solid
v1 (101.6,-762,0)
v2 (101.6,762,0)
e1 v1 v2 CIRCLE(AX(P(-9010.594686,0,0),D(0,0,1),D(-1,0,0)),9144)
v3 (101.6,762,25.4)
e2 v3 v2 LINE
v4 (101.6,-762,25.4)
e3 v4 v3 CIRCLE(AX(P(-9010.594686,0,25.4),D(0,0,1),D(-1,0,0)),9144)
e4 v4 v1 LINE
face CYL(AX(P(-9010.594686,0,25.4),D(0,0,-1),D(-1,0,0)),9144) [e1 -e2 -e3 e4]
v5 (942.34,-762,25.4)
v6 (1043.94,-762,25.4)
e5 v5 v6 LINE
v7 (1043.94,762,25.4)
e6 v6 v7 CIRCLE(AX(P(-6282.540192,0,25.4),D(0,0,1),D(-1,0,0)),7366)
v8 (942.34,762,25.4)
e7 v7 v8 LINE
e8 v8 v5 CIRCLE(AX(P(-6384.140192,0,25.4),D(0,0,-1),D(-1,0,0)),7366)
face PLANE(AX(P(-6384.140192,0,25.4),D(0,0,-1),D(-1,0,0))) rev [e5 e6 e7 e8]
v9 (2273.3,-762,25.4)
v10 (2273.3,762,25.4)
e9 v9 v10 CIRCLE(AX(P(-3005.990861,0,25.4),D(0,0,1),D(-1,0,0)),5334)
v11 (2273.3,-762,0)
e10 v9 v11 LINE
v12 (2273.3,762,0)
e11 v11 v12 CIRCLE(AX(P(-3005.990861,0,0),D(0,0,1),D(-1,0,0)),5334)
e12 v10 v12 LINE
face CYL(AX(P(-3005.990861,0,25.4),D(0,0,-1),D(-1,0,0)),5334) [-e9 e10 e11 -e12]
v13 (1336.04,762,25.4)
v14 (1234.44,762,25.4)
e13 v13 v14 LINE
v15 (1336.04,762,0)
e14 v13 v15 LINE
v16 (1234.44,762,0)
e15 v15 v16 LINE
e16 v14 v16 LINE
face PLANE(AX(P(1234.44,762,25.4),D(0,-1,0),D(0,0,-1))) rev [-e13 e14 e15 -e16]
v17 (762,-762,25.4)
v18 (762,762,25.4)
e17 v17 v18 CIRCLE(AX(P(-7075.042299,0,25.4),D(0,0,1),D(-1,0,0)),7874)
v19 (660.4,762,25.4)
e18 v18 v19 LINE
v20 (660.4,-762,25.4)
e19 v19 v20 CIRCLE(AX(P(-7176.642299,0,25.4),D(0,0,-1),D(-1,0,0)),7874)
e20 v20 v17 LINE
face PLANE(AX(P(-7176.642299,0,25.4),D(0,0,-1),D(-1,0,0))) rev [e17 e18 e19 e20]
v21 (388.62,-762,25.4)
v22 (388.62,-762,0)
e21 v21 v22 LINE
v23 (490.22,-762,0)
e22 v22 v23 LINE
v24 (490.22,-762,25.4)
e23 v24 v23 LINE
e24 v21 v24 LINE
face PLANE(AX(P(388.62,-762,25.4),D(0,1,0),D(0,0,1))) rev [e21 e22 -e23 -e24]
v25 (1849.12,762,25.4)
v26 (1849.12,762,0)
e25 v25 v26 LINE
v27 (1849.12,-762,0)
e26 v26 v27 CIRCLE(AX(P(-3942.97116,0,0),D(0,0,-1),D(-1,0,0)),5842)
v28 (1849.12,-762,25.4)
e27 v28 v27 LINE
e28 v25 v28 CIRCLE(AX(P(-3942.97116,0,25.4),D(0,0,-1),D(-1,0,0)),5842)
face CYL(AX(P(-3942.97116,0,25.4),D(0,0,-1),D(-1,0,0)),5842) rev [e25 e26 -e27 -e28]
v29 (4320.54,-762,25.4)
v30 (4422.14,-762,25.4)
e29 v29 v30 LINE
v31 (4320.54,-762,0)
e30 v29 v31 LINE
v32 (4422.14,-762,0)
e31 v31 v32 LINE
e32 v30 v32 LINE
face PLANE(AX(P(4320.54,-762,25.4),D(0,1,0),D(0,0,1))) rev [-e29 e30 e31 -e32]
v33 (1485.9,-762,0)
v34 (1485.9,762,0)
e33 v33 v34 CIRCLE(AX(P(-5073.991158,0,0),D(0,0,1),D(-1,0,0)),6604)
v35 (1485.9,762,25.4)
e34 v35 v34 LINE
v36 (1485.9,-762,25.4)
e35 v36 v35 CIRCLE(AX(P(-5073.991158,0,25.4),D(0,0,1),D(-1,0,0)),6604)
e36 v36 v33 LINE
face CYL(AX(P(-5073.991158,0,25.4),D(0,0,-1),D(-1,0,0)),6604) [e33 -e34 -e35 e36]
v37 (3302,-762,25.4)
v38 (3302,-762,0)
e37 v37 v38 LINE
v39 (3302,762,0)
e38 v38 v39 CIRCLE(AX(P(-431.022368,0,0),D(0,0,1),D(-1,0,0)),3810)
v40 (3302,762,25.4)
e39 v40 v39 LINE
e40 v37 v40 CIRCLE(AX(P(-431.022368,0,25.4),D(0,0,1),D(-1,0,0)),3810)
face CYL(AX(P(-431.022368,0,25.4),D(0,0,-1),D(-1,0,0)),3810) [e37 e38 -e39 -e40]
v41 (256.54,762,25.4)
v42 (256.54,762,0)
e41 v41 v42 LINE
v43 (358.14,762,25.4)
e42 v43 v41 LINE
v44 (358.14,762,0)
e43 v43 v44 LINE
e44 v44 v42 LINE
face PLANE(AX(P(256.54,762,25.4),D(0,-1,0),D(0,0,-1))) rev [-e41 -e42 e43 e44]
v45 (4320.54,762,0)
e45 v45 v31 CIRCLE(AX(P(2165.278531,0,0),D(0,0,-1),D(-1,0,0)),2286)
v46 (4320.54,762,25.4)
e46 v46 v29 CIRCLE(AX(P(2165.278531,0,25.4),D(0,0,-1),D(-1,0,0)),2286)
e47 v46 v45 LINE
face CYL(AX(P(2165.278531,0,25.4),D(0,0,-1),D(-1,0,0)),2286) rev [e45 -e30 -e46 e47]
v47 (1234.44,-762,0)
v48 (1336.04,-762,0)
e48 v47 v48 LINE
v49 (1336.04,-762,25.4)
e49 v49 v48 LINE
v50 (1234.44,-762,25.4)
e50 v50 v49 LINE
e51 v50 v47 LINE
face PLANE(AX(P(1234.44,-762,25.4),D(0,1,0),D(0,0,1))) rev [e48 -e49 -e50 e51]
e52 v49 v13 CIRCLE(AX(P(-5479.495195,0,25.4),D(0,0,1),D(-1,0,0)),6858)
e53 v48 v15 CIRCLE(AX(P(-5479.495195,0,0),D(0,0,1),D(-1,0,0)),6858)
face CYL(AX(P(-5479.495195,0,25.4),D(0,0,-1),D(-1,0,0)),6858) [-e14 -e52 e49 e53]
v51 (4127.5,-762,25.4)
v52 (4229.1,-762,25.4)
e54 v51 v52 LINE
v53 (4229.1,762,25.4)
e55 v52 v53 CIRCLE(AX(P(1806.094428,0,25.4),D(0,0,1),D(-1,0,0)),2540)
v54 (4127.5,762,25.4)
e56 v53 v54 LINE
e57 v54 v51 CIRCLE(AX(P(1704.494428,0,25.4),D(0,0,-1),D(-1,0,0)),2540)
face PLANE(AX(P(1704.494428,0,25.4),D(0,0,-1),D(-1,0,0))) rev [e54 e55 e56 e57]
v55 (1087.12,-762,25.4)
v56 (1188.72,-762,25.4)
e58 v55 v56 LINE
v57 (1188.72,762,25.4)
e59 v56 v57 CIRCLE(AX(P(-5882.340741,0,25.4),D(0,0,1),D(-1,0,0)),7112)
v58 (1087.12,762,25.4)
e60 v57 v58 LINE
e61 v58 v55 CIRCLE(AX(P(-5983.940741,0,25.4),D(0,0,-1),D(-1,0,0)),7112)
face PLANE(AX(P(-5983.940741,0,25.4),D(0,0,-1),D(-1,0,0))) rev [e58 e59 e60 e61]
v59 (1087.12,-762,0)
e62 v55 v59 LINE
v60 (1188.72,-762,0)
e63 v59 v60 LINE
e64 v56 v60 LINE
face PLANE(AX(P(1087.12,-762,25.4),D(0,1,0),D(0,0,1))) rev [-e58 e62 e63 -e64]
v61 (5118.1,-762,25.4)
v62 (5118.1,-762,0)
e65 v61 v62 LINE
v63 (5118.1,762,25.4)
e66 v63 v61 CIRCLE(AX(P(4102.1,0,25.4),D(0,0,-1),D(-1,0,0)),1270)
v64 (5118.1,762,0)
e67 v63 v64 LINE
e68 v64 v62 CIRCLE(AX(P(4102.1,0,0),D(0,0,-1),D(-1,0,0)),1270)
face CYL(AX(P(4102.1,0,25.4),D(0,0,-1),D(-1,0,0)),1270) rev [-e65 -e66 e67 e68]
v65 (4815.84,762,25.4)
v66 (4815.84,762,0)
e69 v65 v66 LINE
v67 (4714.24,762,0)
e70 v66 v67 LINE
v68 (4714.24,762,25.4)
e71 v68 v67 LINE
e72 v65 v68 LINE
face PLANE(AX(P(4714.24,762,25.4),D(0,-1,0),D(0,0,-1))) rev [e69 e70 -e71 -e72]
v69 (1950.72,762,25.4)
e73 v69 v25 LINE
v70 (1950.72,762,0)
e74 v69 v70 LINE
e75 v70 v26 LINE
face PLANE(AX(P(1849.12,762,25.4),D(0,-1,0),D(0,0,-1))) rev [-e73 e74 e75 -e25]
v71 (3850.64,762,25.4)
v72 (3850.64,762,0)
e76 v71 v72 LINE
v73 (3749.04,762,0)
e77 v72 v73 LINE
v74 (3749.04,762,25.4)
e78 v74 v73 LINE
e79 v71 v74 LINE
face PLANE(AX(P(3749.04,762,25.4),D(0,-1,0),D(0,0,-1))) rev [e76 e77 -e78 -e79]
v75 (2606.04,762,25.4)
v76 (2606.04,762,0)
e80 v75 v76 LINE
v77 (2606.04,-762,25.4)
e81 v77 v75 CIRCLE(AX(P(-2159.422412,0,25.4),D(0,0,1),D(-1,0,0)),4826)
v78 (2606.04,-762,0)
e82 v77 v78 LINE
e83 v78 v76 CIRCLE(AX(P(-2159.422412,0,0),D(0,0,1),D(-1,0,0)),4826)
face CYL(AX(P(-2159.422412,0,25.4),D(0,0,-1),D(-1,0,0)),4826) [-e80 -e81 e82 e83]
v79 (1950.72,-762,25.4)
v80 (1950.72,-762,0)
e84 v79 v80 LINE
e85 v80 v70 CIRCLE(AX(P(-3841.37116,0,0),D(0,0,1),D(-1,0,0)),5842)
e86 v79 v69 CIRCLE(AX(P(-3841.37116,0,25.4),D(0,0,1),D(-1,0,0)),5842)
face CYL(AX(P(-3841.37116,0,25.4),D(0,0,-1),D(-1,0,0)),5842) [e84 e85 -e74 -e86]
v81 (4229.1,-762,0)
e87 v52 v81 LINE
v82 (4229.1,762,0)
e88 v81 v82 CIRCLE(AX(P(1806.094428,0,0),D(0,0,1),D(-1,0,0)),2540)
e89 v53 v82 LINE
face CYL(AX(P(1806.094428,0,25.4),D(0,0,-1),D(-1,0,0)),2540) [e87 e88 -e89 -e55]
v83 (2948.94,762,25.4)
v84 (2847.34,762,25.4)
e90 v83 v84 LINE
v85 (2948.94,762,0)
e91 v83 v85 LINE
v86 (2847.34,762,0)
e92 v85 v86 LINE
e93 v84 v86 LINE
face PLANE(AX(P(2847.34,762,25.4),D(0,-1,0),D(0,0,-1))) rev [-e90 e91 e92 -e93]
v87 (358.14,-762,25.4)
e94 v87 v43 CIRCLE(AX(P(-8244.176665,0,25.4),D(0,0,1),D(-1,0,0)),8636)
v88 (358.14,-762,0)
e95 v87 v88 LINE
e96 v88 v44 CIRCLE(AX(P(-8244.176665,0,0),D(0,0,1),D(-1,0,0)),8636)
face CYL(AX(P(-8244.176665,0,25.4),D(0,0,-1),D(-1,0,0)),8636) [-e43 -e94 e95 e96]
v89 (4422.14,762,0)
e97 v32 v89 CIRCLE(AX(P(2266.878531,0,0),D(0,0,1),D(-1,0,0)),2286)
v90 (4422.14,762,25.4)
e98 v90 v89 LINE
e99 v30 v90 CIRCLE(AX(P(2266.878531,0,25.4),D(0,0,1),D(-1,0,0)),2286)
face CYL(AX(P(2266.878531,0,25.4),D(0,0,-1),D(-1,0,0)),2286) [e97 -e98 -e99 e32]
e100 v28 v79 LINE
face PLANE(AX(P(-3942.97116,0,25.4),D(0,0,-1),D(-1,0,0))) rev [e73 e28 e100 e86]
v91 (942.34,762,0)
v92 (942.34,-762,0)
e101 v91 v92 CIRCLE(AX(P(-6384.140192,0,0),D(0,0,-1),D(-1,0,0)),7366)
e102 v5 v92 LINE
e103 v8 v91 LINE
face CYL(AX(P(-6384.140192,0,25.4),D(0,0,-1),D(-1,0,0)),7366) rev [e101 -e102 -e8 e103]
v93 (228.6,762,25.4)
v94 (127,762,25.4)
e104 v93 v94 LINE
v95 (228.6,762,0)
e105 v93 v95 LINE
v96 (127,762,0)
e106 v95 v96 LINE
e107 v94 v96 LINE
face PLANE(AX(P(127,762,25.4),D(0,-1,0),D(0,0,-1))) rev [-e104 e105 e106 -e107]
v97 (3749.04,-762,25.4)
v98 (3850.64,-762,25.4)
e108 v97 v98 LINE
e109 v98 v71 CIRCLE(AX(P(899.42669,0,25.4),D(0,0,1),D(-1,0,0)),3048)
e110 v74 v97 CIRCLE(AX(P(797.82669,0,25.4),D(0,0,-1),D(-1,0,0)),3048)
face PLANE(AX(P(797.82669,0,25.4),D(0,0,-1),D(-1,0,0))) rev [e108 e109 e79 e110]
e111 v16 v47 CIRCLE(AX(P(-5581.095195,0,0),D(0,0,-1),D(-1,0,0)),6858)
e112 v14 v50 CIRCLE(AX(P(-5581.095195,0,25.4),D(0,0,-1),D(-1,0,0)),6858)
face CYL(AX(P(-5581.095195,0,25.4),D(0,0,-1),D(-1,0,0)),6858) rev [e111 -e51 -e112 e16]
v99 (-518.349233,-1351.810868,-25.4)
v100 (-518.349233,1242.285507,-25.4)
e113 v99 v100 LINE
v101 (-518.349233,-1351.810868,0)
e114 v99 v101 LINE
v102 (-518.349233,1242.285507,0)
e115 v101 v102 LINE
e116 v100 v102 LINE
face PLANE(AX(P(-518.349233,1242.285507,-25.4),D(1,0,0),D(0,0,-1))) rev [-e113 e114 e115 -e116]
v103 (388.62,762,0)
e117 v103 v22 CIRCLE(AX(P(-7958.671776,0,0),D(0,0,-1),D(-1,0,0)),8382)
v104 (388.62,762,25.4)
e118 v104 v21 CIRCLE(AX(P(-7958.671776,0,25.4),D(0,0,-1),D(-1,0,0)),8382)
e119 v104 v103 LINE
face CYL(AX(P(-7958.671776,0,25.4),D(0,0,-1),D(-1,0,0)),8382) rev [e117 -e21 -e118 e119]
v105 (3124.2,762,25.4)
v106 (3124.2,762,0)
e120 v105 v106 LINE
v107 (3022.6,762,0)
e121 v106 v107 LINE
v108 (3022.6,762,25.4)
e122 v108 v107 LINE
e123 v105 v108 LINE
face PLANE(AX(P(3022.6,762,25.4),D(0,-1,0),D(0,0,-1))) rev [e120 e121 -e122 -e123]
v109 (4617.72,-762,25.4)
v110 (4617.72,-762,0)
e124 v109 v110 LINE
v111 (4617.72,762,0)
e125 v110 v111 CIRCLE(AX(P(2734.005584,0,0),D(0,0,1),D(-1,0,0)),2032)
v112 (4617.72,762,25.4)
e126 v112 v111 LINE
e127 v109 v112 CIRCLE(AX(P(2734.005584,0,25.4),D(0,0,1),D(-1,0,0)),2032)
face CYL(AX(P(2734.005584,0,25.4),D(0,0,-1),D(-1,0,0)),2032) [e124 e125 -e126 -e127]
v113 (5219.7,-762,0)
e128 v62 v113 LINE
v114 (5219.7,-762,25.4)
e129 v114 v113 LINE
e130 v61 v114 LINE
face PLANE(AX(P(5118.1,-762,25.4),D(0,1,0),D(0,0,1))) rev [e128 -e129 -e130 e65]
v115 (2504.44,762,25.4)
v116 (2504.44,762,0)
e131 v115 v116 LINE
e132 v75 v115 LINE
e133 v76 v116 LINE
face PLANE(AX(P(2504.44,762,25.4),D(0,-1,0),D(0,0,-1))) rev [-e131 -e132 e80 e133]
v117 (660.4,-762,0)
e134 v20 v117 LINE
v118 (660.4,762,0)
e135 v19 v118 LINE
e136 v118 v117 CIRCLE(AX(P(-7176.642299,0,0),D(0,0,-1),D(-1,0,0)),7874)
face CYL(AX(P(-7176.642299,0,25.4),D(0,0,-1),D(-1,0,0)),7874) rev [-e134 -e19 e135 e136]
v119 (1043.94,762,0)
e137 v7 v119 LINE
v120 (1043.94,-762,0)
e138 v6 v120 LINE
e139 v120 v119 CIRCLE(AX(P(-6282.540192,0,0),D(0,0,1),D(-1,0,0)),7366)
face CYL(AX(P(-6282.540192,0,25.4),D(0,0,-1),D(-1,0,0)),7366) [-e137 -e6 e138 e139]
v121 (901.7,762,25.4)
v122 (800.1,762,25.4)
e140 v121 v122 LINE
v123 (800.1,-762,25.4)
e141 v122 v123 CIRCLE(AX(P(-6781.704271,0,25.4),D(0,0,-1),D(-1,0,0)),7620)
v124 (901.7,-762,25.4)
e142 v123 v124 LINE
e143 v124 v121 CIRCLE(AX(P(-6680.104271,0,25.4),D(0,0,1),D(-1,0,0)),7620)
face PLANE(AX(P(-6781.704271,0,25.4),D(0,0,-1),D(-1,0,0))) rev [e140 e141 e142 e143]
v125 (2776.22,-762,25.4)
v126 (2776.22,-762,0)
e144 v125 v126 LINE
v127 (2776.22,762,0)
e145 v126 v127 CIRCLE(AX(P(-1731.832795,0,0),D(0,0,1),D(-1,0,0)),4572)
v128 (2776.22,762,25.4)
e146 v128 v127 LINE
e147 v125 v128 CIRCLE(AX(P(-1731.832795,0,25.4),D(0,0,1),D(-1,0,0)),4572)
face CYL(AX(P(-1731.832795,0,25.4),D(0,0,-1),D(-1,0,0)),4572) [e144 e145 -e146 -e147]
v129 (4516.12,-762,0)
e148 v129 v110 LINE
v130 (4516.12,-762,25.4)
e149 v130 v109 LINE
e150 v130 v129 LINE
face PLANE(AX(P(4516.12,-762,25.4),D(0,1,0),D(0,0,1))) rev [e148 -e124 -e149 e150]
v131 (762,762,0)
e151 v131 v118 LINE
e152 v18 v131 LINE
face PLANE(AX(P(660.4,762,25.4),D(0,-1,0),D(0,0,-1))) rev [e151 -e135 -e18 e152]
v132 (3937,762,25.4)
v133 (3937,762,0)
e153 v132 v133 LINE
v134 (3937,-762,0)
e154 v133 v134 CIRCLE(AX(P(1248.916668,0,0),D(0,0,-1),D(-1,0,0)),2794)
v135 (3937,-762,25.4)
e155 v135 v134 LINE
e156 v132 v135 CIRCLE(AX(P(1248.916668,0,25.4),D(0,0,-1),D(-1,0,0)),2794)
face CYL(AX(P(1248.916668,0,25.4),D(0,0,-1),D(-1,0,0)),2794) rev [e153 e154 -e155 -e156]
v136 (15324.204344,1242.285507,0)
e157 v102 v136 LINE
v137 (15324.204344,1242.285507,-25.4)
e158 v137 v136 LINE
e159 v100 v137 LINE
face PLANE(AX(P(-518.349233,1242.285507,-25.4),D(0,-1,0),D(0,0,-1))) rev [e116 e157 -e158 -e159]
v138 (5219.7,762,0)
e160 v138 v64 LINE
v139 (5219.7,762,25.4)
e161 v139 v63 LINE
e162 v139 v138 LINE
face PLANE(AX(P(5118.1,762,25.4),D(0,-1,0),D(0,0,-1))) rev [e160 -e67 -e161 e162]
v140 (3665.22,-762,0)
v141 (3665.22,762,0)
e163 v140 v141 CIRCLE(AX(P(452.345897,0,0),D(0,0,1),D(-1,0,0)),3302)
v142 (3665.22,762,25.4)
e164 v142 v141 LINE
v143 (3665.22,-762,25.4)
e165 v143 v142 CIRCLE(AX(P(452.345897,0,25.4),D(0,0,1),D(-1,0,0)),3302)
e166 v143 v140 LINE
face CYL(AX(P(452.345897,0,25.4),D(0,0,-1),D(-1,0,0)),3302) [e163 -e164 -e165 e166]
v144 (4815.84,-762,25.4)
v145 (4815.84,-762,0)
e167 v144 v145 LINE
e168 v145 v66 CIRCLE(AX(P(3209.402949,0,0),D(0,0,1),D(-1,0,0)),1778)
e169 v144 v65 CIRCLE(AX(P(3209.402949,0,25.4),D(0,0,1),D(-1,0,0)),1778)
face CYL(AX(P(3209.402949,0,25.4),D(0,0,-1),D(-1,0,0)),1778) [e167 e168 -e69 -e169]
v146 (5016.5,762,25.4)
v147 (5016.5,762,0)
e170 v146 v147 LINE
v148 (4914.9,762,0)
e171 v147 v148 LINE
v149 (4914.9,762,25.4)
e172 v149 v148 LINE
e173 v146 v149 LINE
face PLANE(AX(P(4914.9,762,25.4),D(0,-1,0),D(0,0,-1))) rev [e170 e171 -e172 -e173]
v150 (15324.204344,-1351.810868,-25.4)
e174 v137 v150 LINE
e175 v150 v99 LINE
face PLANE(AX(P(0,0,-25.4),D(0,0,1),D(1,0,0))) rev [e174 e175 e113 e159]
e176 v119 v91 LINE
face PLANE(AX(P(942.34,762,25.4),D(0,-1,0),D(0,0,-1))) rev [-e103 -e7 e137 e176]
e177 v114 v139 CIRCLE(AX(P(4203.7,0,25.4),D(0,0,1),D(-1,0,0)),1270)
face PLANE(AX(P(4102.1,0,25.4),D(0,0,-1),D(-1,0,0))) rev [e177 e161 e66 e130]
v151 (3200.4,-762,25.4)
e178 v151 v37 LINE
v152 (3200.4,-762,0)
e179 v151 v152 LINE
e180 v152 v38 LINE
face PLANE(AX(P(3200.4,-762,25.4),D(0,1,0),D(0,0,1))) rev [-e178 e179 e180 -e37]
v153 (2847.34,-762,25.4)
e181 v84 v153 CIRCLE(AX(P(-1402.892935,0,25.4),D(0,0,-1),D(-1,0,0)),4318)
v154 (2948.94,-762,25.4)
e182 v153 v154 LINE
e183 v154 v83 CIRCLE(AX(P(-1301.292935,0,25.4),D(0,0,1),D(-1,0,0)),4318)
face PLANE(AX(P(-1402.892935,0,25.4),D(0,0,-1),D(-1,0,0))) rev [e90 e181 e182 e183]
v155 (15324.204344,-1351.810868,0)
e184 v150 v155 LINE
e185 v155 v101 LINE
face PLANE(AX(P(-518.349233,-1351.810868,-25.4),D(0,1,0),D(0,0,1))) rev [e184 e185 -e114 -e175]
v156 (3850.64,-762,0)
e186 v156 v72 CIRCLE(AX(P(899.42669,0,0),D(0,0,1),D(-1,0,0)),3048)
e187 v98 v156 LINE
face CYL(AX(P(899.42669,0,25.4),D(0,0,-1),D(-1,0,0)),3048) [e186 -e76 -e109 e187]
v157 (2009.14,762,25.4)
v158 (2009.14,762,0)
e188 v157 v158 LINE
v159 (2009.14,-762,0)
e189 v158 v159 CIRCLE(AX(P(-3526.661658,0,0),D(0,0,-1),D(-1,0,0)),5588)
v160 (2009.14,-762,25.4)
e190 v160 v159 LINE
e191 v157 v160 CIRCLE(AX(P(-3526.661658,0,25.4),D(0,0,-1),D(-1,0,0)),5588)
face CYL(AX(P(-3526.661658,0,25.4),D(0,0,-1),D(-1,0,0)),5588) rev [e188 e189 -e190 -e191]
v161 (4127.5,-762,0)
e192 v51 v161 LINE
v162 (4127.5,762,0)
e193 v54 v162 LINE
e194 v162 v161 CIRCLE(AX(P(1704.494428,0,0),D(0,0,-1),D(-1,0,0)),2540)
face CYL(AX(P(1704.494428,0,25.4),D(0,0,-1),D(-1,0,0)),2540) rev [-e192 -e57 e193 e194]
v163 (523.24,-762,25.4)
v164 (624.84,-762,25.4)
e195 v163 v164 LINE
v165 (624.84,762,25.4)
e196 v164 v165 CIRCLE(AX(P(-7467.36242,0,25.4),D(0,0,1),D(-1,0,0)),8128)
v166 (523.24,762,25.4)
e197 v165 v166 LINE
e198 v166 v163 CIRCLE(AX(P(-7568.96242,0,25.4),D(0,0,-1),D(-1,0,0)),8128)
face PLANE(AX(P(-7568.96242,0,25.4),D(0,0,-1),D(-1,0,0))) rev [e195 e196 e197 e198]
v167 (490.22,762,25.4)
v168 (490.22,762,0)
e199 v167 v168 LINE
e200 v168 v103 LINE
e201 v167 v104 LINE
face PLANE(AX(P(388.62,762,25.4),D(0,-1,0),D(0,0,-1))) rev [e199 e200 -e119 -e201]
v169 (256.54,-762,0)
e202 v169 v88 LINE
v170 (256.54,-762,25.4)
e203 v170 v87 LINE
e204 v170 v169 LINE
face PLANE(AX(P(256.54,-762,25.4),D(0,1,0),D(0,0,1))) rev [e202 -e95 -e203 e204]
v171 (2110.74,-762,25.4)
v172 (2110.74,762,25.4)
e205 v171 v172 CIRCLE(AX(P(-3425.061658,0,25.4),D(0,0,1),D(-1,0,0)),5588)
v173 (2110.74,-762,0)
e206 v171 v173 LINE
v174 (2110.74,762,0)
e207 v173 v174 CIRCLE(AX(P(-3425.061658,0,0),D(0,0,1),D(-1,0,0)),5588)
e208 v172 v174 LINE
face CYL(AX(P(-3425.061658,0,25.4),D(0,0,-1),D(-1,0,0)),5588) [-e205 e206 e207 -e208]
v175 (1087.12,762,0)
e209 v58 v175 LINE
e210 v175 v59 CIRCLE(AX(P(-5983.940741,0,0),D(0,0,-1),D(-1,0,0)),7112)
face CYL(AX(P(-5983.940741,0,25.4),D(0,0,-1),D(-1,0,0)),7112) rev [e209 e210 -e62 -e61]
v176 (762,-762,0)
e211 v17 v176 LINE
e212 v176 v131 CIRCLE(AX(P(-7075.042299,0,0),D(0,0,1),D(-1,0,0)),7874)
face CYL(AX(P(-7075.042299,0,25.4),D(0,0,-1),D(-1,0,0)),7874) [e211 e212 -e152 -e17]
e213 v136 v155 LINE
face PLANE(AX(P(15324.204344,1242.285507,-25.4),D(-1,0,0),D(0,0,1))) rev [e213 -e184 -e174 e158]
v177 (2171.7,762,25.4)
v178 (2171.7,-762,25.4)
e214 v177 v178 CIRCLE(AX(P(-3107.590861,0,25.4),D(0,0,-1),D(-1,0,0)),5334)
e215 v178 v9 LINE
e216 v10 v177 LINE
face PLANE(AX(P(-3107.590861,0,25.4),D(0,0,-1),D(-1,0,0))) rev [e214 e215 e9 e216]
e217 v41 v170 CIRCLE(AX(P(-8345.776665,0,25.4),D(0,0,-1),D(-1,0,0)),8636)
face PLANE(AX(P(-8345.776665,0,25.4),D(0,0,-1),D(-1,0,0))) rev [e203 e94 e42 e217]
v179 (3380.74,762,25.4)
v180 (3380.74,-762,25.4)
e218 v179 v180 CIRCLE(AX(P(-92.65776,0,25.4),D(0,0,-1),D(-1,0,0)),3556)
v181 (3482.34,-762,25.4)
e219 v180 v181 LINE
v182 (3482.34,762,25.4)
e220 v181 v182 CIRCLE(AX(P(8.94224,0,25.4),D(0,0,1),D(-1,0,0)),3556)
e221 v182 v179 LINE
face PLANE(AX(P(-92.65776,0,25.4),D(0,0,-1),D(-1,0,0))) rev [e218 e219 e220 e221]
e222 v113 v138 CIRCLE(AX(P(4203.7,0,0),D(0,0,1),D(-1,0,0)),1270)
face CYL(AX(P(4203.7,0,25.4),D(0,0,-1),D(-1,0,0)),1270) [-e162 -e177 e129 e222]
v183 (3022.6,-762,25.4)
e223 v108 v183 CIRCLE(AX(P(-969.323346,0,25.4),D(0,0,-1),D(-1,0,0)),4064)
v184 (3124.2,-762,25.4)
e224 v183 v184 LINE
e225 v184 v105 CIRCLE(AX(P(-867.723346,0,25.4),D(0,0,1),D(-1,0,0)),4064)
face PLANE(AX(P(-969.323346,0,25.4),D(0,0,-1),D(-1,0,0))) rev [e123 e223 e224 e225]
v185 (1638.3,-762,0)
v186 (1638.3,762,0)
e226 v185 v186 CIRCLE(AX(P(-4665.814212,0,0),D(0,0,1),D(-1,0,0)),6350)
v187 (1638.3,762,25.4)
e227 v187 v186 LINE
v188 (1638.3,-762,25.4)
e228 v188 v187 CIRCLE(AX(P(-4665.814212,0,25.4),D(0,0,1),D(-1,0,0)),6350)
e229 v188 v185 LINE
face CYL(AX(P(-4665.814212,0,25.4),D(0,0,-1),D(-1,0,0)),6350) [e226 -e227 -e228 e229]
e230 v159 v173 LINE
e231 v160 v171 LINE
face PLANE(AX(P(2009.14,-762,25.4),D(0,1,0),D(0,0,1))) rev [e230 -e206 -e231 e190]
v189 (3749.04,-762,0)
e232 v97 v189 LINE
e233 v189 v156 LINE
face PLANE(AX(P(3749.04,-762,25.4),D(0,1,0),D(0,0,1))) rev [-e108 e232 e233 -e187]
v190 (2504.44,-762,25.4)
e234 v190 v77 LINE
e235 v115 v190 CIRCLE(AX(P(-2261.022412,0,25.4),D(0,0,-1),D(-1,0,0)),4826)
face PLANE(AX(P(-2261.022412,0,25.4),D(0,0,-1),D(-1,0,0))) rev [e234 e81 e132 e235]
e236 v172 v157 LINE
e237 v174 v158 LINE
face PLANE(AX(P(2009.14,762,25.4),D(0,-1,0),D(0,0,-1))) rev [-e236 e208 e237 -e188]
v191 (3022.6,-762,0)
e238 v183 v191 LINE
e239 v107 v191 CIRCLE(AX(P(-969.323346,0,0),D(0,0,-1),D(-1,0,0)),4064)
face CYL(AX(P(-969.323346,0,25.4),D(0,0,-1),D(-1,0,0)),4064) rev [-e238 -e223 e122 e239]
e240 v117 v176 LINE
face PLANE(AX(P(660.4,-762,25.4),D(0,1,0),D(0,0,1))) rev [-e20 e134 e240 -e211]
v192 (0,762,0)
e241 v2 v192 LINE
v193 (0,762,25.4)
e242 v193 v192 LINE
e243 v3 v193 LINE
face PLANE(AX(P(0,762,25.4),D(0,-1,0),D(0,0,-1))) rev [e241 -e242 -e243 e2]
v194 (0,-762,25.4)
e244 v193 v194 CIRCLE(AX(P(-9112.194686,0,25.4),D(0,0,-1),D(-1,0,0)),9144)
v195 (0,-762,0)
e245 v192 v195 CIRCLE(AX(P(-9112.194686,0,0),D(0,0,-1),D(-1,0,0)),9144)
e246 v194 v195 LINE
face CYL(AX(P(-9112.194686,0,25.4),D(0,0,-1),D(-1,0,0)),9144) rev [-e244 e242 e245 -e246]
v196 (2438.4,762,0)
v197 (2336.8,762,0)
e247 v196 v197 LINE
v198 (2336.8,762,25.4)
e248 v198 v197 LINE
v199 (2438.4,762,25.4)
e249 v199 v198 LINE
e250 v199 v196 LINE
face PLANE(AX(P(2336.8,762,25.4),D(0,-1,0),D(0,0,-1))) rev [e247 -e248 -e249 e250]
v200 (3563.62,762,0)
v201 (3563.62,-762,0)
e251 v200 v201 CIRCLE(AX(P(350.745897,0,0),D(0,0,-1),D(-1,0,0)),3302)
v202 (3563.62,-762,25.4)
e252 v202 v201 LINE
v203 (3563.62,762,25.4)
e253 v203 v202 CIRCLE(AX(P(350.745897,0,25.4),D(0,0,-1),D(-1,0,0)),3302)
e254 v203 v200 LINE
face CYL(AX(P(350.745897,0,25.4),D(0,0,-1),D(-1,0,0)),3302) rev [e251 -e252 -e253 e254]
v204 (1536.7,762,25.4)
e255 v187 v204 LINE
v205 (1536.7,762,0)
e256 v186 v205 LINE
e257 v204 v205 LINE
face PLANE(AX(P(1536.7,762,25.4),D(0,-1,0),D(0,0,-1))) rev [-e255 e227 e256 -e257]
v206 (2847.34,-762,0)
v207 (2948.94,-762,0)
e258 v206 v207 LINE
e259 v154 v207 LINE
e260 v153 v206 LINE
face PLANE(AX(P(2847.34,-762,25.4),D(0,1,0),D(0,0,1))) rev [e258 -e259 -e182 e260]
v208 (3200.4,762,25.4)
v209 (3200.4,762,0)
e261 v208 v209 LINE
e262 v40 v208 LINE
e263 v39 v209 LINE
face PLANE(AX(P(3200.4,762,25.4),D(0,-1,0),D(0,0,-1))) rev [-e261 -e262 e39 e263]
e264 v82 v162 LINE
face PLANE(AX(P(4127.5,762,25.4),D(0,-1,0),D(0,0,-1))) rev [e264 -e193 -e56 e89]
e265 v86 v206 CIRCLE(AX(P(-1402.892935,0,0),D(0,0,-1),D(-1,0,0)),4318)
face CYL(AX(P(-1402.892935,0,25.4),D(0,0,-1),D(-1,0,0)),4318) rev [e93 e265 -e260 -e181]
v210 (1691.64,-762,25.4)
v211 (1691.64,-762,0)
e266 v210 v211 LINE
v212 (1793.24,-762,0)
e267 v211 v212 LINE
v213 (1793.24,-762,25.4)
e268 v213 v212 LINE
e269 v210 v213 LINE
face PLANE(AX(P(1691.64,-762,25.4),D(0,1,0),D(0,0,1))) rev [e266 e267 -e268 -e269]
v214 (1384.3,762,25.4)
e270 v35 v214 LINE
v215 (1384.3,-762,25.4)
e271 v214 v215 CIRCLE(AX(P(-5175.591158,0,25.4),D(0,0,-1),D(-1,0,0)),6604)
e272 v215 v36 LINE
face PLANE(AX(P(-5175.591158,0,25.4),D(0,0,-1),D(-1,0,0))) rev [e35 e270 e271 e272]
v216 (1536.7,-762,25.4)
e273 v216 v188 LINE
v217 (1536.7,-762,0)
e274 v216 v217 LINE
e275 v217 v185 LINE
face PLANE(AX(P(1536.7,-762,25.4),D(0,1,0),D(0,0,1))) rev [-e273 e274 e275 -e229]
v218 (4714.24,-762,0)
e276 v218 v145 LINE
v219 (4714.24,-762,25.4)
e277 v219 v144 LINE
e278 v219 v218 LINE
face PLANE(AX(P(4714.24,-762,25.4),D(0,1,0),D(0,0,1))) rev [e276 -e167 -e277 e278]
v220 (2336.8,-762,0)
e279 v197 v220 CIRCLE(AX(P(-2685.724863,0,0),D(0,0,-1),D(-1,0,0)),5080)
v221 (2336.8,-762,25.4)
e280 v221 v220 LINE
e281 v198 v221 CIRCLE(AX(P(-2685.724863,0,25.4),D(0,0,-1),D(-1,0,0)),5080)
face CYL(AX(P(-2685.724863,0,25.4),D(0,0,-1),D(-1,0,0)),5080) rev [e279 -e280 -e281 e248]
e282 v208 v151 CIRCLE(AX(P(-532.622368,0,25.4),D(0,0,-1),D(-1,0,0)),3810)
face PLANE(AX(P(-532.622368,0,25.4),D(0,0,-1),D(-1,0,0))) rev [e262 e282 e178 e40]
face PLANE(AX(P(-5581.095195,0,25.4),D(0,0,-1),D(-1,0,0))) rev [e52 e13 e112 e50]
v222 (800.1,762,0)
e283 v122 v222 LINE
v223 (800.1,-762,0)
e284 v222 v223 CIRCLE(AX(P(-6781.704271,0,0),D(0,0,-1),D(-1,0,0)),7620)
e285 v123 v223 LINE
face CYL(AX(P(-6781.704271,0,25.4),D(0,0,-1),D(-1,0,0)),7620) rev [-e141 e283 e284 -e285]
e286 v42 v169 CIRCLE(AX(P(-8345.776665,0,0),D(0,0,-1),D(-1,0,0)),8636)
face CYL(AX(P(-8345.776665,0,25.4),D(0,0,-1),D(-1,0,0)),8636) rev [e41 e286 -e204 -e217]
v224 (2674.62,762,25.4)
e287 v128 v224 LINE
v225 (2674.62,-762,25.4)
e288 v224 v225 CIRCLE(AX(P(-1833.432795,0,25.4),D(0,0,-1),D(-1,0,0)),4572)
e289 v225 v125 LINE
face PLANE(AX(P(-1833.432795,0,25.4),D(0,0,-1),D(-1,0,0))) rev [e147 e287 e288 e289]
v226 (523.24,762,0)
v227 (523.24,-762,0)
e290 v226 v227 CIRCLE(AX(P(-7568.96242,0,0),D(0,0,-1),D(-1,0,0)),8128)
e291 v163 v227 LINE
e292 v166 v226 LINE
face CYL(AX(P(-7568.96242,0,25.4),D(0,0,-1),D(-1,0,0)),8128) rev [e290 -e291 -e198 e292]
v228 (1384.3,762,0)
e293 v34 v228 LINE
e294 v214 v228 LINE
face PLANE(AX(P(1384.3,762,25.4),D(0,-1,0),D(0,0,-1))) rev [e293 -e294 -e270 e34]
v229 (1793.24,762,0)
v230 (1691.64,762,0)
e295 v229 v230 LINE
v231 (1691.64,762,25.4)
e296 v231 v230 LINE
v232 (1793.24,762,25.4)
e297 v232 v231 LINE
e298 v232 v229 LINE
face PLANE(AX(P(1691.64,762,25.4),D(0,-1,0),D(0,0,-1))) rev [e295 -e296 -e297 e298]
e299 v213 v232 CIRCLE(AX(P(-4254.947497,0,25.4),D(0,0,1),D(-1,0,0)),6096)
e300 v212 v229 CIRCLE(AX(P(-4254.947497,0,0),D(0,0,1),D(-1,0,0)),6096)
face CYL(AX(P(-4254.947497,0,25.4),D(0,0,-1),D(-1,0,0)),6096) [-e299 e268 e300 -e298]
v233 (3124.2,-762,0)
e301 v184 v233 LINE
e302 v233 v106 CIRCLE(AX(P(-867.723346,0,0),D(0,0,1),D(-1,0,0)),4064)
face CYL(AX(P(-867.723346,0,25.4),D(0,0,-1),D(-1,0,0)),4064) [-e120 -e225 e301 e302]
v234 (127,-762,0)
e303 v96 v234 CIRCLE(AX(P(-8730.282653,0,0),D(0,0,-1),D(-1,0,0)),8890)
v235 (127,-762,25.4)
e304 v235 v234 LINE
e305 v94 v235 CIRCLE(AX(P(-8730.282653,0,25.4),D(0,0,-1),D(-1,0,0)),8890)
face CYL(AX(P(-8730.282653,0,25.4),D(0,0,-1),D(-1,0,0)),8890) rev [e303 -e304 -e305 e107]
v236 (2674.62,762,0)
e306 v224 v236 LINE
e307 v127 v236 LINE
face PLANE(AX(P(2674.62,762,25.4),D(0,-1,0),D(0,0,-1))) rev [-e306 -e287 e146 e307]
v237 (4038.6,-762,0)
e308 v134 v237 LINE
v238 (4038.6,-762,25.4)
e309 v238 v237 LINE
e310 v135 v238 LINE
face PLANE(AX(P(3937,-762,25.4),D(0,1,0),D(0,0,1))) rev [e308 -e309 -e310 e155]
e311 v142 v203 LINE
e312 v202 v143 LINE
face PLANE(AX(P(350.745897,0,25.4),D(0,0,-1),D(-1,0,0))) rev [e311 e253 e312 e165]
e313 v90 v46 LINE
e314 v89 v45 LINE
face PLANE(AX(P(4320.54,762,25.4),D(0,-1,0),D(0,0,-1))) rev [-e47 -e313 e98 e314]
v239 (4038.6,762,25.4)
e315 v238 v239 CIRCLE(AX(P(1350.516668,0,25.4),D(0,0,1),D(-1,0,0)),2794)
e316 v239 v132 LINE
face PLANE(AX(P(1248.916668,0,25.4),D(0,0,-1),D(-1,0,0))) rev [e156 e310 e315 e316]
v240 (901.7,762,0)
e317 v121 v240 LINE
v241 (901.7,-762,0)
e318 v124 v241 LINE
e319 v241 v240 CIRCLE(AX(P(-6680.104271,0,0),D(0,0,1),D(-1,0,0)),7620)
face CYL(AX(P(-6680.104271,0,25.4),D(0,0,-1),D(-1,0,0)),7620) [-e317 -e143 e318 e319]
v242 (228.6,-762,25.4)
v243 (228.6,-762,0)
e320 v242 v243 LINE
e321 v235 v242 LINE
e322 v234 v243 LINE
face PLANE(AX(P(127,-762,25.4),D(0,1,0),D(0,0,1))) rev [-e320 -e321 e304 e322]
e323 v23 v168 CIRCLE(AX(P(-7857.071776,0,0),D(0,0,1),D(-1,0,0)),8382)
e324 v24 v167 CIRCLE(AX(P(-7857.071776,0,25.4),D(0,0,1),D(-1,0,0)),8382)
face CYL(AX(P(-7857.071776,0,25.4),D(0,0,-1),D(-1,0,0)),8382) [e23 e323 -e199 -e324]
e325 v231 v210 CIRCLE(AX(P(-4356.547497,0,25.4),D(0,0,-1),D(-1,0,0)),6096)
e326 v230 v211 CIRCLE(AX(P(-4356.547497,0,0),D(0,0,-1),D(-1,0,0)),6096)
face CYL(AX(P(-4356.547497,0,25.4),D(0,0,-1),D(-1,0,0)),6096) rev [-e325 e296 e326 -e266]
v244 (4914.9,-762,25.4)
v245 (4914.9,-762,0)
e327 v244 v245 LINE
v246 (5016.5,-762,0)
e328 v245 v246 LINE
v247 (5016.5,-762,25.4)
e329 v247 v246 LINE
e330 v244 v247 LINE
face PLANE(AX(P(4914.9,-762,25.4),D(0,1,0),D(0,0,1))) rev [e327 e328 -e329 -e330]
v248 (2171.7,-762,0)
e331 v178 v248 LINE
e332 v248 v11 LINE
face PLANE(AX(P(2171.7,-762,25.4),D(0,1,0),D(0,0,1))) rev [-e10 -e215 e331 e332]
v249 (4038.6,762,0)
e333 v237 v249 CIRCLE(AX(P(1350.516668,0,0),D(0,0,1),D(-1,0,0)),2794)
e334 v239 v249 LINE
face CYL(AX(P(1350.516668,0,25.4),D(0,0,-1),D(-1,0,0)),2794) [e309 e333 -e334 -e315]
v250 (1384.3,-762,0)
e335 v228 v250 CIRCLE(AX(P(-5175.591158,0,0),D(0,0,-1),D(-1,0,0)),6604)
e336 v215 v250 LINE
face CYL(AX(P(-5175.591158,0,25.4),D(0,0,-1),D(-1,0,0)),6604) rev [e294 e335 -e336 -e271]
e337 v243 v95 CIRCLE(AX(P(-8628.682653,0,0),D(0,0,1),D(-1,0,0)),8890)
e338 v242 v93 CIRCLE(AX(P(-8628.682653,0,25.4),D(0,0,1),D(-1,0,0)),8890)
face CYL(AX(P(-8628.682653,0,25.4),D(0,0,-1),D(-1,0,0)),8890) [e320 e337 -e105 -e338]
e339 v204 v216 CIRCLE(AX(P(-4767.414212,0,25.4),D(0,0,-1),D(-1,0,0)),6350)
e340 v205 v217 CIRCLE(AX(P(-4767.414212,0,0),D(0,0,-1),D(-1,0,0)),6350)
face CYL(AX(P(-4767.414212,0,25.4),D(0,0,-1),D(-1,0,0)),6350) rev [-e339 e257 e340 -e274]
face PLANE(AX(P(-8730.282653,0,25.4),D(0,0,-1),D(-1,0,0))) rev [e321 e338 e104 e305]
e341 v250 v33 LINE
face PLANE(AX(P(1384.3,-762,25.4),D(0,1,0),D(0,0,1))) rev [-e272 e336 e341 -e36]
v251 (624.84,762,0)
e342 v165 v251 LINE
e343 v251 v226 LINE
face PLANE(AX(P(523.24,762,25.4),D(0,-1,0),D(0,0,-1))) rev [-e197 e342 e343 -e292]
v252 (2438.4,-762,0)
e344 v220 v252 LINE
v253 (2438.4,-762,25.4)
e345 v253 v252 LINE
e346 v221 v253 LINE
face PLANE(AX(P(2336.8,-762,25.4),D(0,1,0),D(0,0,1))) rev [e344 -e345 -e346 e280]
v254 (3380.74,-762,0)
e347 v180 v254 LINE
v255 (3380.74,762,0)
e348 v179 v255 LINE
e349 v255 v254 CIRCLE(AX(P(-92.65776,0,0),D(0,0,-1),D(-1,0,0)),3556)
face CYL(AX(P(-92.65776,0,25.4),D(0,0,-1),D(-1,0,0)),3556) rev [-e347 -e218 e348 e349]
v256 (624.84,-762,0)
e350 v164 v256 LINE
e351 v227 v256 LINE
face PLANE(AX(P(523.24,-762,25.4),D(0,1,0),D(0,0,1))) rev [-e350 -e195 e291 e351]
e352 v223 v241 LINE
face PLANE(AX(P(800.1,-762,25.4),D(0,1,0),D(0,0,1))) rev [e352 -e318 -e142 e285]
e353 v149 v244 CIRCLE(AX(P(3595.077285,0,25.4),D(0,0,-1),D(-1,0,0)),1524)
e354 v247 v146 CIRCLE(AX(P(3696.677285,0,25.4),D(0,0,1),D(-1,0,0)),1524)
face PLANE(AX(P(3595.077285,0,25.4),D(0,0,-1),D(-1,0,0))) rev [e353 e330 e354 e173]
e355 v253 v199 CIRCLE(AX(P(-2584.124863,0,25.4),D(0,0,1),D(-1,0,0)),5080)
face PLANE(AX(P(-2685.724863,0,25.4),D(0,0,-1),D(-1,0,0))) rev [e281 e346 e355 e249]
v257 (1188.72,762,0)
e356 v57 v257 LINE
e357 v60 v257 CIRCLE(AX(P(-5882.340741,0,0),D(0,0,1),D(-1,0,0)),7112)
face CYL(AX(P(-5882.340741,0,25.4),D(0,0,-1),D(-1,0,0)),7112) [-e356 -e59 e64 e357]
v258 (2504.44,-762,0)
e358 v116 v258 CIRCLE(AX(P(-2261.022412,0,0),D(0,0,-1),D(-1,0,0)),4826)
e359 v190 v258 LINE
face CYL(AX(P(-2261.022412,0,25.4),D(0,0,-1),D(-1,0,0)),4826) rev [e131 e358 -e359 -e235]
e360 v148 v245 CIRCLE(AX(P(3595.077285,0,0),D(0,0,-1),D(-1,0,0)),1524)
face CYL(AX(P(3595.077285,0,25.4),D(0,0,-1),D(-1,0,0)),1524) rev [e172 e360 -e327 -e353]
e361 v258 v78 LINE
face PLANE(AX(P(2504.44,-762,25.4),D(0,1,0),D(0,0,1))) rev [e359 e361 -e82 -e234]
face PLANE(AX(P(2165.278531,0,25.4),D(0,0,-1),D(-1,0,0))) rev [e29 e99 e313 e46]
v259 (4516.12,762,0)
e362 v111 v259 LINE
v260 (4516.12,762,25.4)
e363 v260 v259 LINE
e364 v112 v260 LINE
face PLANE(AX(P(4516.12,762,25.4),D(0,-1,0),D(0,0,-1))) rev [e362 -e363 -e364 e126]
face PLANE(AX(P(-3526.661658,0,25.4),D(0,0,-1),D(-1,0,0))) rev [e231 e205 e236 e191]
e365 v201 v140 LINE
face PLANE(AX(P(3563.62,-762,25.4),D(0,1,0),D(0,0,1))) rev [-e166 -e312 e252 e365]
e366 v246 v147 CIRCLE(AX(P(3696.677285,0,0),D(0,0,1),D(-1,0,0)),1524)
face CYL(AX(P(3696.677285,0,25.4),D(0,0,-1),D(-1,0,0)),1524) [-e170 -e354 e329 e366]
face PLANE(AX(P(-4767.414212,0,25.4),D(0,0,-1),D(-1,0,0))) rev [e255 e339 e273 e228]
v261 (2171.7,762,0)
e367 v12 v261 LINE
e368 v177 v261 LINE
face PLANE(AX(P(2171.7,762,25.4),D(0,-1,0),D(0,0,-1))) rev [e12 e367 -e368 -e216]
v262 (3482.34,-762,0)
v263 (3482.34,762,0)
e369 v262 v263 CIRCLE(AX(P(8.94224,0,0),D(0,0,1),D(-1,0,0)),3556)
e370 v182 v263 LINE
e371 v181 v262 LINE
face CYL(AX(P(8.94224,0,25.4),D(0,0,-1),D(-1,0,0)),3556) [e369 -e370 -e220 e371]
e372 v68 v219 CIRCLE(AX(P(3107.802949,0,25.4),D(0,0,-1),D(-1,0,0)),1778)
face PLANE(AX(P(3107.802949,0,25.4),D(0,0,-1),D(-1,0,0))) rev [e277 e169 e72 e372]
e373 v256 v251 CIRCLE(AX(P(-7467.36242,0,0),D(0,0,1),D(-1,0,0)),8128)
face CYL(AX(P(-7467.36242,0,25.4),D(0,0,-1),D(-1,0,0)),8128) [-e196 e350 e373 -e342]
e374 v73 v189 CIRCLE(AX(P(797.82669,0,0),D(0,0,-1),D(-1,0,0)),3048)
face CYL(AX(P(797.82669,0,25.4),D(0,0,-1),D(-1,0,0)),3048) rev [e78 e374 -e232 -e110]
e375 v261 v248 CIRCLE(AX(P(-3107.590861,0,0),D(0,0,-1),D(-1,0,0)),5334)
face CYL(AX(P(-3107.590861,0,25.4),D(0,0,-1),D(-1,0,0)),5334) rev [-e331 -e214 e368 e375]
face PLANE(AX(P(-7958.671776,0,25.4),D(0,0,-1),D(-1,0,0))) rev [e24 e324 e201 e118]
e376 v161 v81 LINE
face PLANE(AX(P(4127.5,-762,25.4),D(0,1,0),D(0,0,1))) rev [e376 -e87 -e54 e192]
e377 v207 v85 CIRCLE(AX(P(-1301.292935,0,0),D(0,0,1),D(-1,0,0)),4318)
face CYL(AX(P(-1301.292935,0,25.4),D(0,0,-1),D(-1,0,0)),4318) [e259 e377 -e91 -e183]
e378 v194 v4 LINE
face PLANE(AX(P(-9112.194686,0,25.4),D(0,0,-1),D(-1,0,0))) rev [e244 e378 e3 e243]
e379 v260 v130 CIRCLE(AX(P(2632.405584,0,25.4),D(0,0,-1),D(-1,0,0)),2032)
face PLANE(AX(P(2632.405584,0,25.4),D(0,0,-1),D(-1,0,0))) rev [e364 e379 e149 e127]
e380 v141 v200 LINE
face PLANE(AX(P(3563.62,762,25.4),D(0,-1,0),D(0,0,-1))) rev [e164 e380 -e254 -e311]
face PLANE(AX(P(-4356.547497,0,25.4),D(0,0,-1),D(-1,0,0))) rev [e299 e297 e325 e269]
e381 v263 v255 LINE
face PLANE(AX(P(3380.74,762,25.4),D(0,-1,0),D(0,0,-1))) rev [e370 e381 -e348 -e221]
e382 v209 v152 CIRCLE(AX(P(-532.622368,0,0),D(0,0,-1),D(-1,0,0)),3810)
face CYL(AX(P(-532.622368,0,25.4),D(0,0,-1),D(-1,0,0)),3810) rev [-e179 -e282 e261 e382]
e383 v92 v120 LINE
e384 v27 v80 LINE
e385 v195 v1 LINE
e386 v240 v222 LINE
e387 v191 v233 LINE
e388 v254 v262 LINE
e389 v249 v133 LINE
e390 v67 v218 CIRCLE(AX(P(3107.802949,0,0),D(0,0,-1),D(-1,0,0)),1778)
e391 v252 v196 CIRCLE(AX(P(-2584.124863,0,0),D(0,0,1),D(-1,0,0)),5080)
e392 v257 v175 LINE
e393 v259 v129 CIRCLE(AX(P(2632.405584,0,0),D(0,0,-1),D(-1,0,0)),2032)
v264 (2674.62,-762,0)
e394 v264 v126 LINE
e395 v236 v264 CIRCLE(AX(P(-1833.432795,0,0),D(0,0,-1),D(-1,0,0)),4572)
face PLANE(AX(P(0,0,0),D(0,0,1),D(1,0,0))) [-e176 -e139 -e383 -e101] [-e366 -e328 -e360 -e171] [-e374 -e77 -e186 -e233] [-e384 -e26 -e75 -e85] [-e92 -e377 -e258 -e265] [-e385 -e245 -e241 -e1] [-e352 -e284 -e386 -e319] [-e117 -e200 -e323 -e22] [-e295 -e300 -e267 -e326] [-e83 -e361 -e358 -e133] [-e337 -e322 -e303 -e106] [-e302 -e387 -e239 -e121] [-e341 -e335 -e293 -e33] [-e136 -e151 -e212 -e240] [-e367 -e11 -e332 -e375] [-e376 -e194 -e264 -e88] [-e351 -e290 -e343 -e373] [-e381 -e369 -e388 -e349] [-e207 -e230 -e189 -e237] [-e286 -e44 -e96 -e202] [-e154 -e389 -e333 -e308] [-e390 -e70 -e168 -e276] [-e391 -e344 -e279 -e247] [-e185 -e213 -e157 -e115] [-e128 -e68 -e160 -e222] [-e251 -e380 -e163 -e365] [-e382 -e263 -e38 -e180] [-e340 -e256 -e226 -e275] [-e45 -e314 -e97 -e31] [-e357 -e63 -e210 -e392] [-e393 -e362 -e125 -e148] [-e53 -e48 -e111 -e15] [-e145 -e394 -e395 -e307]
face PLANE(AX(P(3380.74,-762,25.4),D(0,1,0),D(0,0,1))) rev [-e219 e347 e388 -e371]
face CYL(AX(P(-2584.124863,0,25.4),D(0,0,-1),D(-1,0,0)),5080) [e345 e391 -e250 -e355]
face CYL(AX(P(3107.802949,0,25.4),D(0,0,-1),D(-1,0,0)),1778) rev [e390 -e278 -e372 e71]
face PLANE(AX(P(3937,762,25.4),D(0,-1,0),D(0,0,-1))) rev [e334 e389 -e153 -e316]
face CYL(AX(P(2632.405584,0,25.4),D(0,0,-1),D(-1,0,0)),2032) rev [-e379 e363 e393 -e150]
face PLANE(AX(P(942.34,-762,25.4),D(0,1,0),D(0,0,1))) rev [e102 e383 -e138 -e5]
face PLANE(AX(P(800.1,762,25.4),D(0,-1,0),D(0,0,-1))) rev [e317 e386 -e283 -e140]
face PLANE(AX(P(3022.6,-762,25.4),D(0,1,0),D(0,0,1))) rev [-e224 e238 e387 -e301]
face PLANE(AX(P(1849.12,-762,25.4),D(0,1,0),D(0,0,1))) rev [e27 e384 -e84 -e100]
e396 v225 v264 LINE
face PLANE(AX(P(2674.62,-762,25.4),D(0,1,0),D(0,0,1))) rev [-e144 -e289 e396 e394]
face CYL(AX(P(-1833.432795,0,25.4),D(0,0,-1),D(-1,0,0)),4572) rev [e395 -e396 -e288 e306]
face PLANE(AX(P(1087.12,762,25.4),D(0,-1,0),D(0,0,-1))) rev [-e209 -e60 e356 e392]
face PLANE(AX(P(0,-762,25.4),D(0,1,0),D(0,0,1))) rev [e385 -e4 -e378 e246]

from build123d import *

# Parameters (mm, degrees)
BOSS_EXTRUDE1_DEPTH = 25.4
SKETCH2_W           = 15842.55357726
SKETCH2_H           = 2594.096375424
BOSS_EXTRUDE2_DEPTH = 25.4
LPATTERN1_DEPTH     = 25.4


# Read off the part's stored shape, not the designer's step: LPattern1
with BuildPart() as part:
    # Sketch1 → Boss-Extrude1 (new body)
    with BuildSketch(Plane.XY):
        with BuildLine():
            Line((0, 762), (101.6, 762))
            ThreePointArc((101.6, 762), (133.405313757, 0), (101.6, -762))
            Line((101.6, -762), (0, -762))
            ThreePointArc((0, -762), (31.805313757, 0), (0, 762))
        make_face()
    extrude(amount=BOSS_EXTRUDE1_DEPTH)

    # Sketch2 → Boss-Extrude2 (add)
    with BuildSketch(Plane(origin=(0, 0, 0), x_dir=(-1, 0, 0), z_dir=(0, 0, -1))):
        with Locations((-7402.927555246, -54.762680467)):
            Rectangle(SKETCH2_W, SKETCH2_H)
    extrude(amount=BOSS_EXTRUDE2_DEPTH)

    # LPattern1 outline → LPattern1 (add)
    with BuildSketch(Plane.XY):
        with BuildLine():
            Line((127, -762), (228.6, -762))
            ThreePointArc((228.6, -762), (261.317346725, 0), (228.6, 762))
            Line((228.6, 762), (127, 762))
            ThreePointArc((127, 762), (159.717346725, 0), (127, -762))
        make_face()
        with BuildLine():
            Line((256.54, -762), (358.14, -762))
            ThreePointArc((358.14, -762), (391.823335287, 0), (358.14, 762))
            Line((358.14, 762), (256.54, 762))
            ThreePointArc((256.54, 762), (290.223335287, 0), (256.54, -762))
        make_face()
        with BuildLine():
            Line((388.62, -762), (490.22, -762))
            ThreePointArc((490.22, -762), (524.928223621, 0), (490.22, 762))
            Line((490.22, 762), (388.62, 762))
            ThreePointArc((388.62, 762), (423.328223621, 0), (388.62, -762))
        make_face()
        with BuildLine():
            Line((523.24, -762), (624.84, -762))
            ThreePointArc((624.84, -762), (660.637580386, 0), (624.84, 762))
            Line((624.84, 762), (523.24, 762))
            ThreePointArc((523.24, 762), (559.037580386, 0), (523.24, -762))
        make_face()
        with BuildLine():
            Line((660.4, -762), (762, -762))
            ThreePointArc((762, -762), (798.957700765, 0), (762, 762))
            Line((762, 762), (660.4, 762))
            ThreePointArc((660.4, 762), (697.357700765, 0), (660.4, -762))
        make_face()
        with BuildLine():
            Line((800.1, -762), (901.7, -762))
            ThreePointArc((901.7, -762), (939.895729248, 0), (901.7, 762))
            Line((901.7, 762), (800.1, 762))
            ThreePointArc((800.1, 762), (838.295729248, 0), (800.1, -762))
        make_face()
        with BuildLine():
            Line((942.34, -762), (1043.94, -762))
            ThreePointArc((1043.94, -762), (1083.459808257, 0), (1043.94, 762))
            Line((1043.94, 762), (942.34, 762))
            ThreePointArc((942.34, 762), (981.859808257, 0), (942.34, -762))
        make_face()
        with BuildLine():
            Line((1087.12, -762), (1188.72, -762))
            ThreePointArc((1188.72, -762), (1229.659259206, 0), (1188.72, 762))
            Line((1188.72, 762), (1087.12, 762))
            ThreePointArc((1087.12, 762), (1128.059259206, 0), (1087.12, -762))
        make_face()
        with BuildLine():
            Line((1234.44, -762), (1336.04, -762))
            ThreePointArc((1336.04, -762), (1378.504804581, 0), (1336.04, 762))
            Line((1336.04, 762), (1234.44, 762))
            ThreePointArc((1234.44, 762), (1276.904804581, 0), (1234.44, -762))
        make_face()
        with BuildLine():
            Line((1384.3, -762), (1485.9, -762))
            ThreePointArc((1485.9, -762), (1530.008842366, 0), (1485.9, 762))
            Line((1485.9, 762), (1384.3, 762))
            ThreePointArc((1384.3, 762), (1428.408842366, 0), (1384.3, -762))
        make_face()
        with BuildLine():
            Line((1536.7, -762), (1638.3, -762))
            ThreePointArc((1638.3, -762), (1684.185787837, 0), (1638.3, 762))
            Line((1638.3, 762), (1536.7, 762))
            ThreePointArc((1536.7, 762), (1582.585787837, 0), (1536.7, -762))
        make_face()
        with BuildLine():
            Line((1691.64, -762), (1793.24, -762))
            ThreePointArc((1793.24, -762), (1841.052502906, 0), (1793.24, 762))
            Line((1793.24, 762), (1691.64, 762))
            ThreePointArc((1691.64, 762), (1739.452502906, 0), (1691.64, -762))
        make_face()
        with BuildLine():
            Line((1849.12, -762), (1950.72, -762))
            ThreePointArc((1950.72, -762), (2000.628840496, 0), (1950.72, 762))
            Line((1950.72, 762), (1849.12, 762))
            ThreePointArc((1849.12, 762), (1899.028840496, 0), (1849.12, -762))
        make_face()
        with BuildLine():
            Line((2009.14, -762), (2110.74, -762))
            ThreePointArc((2110.74, -762), (2162.938341703, 0), (2110.74, 762))
            Line((2110.74, 762), (2009.14, 762))
            ThreePointArc((2009.14, 762), (2061.338341703, 0), (2009.14, -762))
        make_face()
        with BuildLine():
            Line((2171.7, -762), (2273.3, -762))
            ThreePointArc((2273.3, -762), (2328.00913853, 0), (2273.3, 762))
            Line((2273.3, 762), (2171.7, 762))
            ThreePointArc((2171.7, 762), (2226.40913853, 0), (2171.7, -762))
        make_face()
        with BuildLine():
            Line((2336.8, -762), (2438.4, -762))
            ThreePointArc((2438.4, -762), (2495.875136946, 0), (2438.4, 762))
            Line((2438.4, 762), (2336.8, 762))
            ThreePointArc((2336.8, 762), (2394.275136946, 0), (2336.8, -762))
        make_face()
        with BuildLine():
            Line((2504.44, -762), (2606.04, -762))
            ThreePointArc((2606.04, -762), (2666.577588019, 0), (2606.04, 762))
            Line((2606.04, 762), (2504.44, 762))
            ThreePointArc((2504.44, 762), (2564.977588019, 0), (2504.44, -762))
        make_face()
        with BuildLine():
            Line((2674.62, -762), (2776.22, -762))
            ThreePointArc((2776.22, -762), (2840.167205278, 0), (2776.22, 762))
            Line((2776.22, 762), (2674.62, 762))
            ThreePointArc((2674.62, 762), (2738.567205278, 0), (2674.62, -762))
        make_face()
        with BuildLine():
            Line((2847.34, -762), (2948.94, -762))
            ThreePointArc((2948.94, -762), (3016.707065207, 0), (2948.94, 762))
            Line((2948.94, 762), (2847.34, 762))
            ThreePointArc((2847.34, 762), (2915.107065207, 0), (2847.34, -762))
        make_face()
        with BuildLine():
            Line((3022.6, -762), (3124.2, -762))
            ThreePointArc((3124.2, -762), (3196.276654043, 0), (3124.2, 762))
            Line((3124.2, 762), (3022.6, 762))
            ThreePointArc((3022.6, 762), (3094.676654043, 0), (3022.6, -762))
        make_face()
        with BuildLine():
            Line((3200.4, -762), (3302, -762))
            ThreePointArc((3302, -762), (3378.977631998, 0), (3302, 762))
            Line((3302, 762), (3200.4, 762))
            ThreePointArc((3200.4, 762), (3277.377631998, 0), (3200.4, -762))
        make_face()
        with BuildLine():
            Line((3380.74, -762), (3482.34, -762))
            ThreePointArc((3482.34, -762), (3564.942239881, 0), (3482.34, 762))
            Line((3482.34, 762), (3380.74, 762))
            ThreePointArc((3380.74, 762), (3463.342239881, 0), (3380.74, -762))
        make_face()
        with BuildLine():
            Line((3563.62, -762), (3665.22, -762))
            ThreePointArc((3665.22, -762), (3754.345897269, 0), (3665.22, 762))
            Line((3665.22, 762), (3563.62, 762))
            ThreePointArc((3563.62, 762), (3652.745897269, 0), (3563.62, -762))
        make_face()
        with BuildLine():
            Line((3749.04, -762), (3850.64, -762))
            ThreePointArc((3850.64, -762), (3947.42669019, 0), (3850.64, 762))
            Line((3850.64, 762), (3749.04, 762))
            ThreePointArc((3749.04, 762), (3845.82669019, 0), (3749.04, -762))
        make_face()
        with BuildLine():
            Line((3937, -762), (4038.6, -762))
            ThreePointArc((4038.6, -762), (4144.516667958, 0), (4038.6, 762))
            Line((4038.6, 762), (3937, 762))
            ThreePointArc((3937, 762), (4042.916667958, 0), (3937, -762))
        make_face()
        with BuildLine():
            Line((4127.5, -762), (4229.1, -762))
            ThreePointArc((4229.1, -762), (4346.094428401, 0), (4229.1, 762))
            Line((4229.1, 762), (4127.5, 762))
            ThreePointArc((4127.5, 762), (4244.494428401, 0), (4127.5, -762))
        make_face()
        with BuildLine():
            Line((4320.54, -762), (4422.14, -762))
            ThreePointArc((4422.14, -762), (4552.878530943, 0), (4422.14, 762))
            Line((4422.14, 762), (4320.54, 762))
            ThreePointArc((4320.54, 762), (4451.278530943, 0), (4320.54, -762))
        make_face()
        with BuildLine():
            Line((4516.12, -762), (4617.72, -762))
            ThreePointArc((4617.72, -762), (4766.005584278, 0), (4617.72, 762))
            Line((4617.72, 762), (4516.12, 762))
            ThreePointArc((4516.12, 762), (4664.405584278, 0), (4516.12, -762))
        make_face()
        with BuildLine():
            Line((4714.24, -762), (4815.84, -762))
            ThreePointArc((4815.84, -762), (4987.402948634, 0), (4815.84, 762))
            Line((4815.84, 762), (4714.24, 762))
            ThreePointArc((4714.24, 762), (4885.802948634, 0), (4714.24, -762))
        make_face()
        with BuildLine():
            Line((4914.9, -762), (5016.5, -762))
            ThreePointArc((5016.5, -762), (5220.677284633, 0), (5016.5, 762))
            Line((5016.5, 762), (4914.9, 762))
            ThreePointArc((4914.9, 762), (5119.077284633, 0), (4914.9, -762))
        make_face()
        with BuildLine():
            Line((5118.1, -762), (5219.7, -762))
            ThreePointArc((5219.7, -762), (5473.7, 0), (5219.7, 762))
            Line((5219.7, 762), (5118.1, 762))
            ThreePointArc((5118.1, 762), (5372.1, 0), (5118.1, -762))
        make_face()
    extrude(amount=LPATTERN1_DEPTH)


solid = part.part
